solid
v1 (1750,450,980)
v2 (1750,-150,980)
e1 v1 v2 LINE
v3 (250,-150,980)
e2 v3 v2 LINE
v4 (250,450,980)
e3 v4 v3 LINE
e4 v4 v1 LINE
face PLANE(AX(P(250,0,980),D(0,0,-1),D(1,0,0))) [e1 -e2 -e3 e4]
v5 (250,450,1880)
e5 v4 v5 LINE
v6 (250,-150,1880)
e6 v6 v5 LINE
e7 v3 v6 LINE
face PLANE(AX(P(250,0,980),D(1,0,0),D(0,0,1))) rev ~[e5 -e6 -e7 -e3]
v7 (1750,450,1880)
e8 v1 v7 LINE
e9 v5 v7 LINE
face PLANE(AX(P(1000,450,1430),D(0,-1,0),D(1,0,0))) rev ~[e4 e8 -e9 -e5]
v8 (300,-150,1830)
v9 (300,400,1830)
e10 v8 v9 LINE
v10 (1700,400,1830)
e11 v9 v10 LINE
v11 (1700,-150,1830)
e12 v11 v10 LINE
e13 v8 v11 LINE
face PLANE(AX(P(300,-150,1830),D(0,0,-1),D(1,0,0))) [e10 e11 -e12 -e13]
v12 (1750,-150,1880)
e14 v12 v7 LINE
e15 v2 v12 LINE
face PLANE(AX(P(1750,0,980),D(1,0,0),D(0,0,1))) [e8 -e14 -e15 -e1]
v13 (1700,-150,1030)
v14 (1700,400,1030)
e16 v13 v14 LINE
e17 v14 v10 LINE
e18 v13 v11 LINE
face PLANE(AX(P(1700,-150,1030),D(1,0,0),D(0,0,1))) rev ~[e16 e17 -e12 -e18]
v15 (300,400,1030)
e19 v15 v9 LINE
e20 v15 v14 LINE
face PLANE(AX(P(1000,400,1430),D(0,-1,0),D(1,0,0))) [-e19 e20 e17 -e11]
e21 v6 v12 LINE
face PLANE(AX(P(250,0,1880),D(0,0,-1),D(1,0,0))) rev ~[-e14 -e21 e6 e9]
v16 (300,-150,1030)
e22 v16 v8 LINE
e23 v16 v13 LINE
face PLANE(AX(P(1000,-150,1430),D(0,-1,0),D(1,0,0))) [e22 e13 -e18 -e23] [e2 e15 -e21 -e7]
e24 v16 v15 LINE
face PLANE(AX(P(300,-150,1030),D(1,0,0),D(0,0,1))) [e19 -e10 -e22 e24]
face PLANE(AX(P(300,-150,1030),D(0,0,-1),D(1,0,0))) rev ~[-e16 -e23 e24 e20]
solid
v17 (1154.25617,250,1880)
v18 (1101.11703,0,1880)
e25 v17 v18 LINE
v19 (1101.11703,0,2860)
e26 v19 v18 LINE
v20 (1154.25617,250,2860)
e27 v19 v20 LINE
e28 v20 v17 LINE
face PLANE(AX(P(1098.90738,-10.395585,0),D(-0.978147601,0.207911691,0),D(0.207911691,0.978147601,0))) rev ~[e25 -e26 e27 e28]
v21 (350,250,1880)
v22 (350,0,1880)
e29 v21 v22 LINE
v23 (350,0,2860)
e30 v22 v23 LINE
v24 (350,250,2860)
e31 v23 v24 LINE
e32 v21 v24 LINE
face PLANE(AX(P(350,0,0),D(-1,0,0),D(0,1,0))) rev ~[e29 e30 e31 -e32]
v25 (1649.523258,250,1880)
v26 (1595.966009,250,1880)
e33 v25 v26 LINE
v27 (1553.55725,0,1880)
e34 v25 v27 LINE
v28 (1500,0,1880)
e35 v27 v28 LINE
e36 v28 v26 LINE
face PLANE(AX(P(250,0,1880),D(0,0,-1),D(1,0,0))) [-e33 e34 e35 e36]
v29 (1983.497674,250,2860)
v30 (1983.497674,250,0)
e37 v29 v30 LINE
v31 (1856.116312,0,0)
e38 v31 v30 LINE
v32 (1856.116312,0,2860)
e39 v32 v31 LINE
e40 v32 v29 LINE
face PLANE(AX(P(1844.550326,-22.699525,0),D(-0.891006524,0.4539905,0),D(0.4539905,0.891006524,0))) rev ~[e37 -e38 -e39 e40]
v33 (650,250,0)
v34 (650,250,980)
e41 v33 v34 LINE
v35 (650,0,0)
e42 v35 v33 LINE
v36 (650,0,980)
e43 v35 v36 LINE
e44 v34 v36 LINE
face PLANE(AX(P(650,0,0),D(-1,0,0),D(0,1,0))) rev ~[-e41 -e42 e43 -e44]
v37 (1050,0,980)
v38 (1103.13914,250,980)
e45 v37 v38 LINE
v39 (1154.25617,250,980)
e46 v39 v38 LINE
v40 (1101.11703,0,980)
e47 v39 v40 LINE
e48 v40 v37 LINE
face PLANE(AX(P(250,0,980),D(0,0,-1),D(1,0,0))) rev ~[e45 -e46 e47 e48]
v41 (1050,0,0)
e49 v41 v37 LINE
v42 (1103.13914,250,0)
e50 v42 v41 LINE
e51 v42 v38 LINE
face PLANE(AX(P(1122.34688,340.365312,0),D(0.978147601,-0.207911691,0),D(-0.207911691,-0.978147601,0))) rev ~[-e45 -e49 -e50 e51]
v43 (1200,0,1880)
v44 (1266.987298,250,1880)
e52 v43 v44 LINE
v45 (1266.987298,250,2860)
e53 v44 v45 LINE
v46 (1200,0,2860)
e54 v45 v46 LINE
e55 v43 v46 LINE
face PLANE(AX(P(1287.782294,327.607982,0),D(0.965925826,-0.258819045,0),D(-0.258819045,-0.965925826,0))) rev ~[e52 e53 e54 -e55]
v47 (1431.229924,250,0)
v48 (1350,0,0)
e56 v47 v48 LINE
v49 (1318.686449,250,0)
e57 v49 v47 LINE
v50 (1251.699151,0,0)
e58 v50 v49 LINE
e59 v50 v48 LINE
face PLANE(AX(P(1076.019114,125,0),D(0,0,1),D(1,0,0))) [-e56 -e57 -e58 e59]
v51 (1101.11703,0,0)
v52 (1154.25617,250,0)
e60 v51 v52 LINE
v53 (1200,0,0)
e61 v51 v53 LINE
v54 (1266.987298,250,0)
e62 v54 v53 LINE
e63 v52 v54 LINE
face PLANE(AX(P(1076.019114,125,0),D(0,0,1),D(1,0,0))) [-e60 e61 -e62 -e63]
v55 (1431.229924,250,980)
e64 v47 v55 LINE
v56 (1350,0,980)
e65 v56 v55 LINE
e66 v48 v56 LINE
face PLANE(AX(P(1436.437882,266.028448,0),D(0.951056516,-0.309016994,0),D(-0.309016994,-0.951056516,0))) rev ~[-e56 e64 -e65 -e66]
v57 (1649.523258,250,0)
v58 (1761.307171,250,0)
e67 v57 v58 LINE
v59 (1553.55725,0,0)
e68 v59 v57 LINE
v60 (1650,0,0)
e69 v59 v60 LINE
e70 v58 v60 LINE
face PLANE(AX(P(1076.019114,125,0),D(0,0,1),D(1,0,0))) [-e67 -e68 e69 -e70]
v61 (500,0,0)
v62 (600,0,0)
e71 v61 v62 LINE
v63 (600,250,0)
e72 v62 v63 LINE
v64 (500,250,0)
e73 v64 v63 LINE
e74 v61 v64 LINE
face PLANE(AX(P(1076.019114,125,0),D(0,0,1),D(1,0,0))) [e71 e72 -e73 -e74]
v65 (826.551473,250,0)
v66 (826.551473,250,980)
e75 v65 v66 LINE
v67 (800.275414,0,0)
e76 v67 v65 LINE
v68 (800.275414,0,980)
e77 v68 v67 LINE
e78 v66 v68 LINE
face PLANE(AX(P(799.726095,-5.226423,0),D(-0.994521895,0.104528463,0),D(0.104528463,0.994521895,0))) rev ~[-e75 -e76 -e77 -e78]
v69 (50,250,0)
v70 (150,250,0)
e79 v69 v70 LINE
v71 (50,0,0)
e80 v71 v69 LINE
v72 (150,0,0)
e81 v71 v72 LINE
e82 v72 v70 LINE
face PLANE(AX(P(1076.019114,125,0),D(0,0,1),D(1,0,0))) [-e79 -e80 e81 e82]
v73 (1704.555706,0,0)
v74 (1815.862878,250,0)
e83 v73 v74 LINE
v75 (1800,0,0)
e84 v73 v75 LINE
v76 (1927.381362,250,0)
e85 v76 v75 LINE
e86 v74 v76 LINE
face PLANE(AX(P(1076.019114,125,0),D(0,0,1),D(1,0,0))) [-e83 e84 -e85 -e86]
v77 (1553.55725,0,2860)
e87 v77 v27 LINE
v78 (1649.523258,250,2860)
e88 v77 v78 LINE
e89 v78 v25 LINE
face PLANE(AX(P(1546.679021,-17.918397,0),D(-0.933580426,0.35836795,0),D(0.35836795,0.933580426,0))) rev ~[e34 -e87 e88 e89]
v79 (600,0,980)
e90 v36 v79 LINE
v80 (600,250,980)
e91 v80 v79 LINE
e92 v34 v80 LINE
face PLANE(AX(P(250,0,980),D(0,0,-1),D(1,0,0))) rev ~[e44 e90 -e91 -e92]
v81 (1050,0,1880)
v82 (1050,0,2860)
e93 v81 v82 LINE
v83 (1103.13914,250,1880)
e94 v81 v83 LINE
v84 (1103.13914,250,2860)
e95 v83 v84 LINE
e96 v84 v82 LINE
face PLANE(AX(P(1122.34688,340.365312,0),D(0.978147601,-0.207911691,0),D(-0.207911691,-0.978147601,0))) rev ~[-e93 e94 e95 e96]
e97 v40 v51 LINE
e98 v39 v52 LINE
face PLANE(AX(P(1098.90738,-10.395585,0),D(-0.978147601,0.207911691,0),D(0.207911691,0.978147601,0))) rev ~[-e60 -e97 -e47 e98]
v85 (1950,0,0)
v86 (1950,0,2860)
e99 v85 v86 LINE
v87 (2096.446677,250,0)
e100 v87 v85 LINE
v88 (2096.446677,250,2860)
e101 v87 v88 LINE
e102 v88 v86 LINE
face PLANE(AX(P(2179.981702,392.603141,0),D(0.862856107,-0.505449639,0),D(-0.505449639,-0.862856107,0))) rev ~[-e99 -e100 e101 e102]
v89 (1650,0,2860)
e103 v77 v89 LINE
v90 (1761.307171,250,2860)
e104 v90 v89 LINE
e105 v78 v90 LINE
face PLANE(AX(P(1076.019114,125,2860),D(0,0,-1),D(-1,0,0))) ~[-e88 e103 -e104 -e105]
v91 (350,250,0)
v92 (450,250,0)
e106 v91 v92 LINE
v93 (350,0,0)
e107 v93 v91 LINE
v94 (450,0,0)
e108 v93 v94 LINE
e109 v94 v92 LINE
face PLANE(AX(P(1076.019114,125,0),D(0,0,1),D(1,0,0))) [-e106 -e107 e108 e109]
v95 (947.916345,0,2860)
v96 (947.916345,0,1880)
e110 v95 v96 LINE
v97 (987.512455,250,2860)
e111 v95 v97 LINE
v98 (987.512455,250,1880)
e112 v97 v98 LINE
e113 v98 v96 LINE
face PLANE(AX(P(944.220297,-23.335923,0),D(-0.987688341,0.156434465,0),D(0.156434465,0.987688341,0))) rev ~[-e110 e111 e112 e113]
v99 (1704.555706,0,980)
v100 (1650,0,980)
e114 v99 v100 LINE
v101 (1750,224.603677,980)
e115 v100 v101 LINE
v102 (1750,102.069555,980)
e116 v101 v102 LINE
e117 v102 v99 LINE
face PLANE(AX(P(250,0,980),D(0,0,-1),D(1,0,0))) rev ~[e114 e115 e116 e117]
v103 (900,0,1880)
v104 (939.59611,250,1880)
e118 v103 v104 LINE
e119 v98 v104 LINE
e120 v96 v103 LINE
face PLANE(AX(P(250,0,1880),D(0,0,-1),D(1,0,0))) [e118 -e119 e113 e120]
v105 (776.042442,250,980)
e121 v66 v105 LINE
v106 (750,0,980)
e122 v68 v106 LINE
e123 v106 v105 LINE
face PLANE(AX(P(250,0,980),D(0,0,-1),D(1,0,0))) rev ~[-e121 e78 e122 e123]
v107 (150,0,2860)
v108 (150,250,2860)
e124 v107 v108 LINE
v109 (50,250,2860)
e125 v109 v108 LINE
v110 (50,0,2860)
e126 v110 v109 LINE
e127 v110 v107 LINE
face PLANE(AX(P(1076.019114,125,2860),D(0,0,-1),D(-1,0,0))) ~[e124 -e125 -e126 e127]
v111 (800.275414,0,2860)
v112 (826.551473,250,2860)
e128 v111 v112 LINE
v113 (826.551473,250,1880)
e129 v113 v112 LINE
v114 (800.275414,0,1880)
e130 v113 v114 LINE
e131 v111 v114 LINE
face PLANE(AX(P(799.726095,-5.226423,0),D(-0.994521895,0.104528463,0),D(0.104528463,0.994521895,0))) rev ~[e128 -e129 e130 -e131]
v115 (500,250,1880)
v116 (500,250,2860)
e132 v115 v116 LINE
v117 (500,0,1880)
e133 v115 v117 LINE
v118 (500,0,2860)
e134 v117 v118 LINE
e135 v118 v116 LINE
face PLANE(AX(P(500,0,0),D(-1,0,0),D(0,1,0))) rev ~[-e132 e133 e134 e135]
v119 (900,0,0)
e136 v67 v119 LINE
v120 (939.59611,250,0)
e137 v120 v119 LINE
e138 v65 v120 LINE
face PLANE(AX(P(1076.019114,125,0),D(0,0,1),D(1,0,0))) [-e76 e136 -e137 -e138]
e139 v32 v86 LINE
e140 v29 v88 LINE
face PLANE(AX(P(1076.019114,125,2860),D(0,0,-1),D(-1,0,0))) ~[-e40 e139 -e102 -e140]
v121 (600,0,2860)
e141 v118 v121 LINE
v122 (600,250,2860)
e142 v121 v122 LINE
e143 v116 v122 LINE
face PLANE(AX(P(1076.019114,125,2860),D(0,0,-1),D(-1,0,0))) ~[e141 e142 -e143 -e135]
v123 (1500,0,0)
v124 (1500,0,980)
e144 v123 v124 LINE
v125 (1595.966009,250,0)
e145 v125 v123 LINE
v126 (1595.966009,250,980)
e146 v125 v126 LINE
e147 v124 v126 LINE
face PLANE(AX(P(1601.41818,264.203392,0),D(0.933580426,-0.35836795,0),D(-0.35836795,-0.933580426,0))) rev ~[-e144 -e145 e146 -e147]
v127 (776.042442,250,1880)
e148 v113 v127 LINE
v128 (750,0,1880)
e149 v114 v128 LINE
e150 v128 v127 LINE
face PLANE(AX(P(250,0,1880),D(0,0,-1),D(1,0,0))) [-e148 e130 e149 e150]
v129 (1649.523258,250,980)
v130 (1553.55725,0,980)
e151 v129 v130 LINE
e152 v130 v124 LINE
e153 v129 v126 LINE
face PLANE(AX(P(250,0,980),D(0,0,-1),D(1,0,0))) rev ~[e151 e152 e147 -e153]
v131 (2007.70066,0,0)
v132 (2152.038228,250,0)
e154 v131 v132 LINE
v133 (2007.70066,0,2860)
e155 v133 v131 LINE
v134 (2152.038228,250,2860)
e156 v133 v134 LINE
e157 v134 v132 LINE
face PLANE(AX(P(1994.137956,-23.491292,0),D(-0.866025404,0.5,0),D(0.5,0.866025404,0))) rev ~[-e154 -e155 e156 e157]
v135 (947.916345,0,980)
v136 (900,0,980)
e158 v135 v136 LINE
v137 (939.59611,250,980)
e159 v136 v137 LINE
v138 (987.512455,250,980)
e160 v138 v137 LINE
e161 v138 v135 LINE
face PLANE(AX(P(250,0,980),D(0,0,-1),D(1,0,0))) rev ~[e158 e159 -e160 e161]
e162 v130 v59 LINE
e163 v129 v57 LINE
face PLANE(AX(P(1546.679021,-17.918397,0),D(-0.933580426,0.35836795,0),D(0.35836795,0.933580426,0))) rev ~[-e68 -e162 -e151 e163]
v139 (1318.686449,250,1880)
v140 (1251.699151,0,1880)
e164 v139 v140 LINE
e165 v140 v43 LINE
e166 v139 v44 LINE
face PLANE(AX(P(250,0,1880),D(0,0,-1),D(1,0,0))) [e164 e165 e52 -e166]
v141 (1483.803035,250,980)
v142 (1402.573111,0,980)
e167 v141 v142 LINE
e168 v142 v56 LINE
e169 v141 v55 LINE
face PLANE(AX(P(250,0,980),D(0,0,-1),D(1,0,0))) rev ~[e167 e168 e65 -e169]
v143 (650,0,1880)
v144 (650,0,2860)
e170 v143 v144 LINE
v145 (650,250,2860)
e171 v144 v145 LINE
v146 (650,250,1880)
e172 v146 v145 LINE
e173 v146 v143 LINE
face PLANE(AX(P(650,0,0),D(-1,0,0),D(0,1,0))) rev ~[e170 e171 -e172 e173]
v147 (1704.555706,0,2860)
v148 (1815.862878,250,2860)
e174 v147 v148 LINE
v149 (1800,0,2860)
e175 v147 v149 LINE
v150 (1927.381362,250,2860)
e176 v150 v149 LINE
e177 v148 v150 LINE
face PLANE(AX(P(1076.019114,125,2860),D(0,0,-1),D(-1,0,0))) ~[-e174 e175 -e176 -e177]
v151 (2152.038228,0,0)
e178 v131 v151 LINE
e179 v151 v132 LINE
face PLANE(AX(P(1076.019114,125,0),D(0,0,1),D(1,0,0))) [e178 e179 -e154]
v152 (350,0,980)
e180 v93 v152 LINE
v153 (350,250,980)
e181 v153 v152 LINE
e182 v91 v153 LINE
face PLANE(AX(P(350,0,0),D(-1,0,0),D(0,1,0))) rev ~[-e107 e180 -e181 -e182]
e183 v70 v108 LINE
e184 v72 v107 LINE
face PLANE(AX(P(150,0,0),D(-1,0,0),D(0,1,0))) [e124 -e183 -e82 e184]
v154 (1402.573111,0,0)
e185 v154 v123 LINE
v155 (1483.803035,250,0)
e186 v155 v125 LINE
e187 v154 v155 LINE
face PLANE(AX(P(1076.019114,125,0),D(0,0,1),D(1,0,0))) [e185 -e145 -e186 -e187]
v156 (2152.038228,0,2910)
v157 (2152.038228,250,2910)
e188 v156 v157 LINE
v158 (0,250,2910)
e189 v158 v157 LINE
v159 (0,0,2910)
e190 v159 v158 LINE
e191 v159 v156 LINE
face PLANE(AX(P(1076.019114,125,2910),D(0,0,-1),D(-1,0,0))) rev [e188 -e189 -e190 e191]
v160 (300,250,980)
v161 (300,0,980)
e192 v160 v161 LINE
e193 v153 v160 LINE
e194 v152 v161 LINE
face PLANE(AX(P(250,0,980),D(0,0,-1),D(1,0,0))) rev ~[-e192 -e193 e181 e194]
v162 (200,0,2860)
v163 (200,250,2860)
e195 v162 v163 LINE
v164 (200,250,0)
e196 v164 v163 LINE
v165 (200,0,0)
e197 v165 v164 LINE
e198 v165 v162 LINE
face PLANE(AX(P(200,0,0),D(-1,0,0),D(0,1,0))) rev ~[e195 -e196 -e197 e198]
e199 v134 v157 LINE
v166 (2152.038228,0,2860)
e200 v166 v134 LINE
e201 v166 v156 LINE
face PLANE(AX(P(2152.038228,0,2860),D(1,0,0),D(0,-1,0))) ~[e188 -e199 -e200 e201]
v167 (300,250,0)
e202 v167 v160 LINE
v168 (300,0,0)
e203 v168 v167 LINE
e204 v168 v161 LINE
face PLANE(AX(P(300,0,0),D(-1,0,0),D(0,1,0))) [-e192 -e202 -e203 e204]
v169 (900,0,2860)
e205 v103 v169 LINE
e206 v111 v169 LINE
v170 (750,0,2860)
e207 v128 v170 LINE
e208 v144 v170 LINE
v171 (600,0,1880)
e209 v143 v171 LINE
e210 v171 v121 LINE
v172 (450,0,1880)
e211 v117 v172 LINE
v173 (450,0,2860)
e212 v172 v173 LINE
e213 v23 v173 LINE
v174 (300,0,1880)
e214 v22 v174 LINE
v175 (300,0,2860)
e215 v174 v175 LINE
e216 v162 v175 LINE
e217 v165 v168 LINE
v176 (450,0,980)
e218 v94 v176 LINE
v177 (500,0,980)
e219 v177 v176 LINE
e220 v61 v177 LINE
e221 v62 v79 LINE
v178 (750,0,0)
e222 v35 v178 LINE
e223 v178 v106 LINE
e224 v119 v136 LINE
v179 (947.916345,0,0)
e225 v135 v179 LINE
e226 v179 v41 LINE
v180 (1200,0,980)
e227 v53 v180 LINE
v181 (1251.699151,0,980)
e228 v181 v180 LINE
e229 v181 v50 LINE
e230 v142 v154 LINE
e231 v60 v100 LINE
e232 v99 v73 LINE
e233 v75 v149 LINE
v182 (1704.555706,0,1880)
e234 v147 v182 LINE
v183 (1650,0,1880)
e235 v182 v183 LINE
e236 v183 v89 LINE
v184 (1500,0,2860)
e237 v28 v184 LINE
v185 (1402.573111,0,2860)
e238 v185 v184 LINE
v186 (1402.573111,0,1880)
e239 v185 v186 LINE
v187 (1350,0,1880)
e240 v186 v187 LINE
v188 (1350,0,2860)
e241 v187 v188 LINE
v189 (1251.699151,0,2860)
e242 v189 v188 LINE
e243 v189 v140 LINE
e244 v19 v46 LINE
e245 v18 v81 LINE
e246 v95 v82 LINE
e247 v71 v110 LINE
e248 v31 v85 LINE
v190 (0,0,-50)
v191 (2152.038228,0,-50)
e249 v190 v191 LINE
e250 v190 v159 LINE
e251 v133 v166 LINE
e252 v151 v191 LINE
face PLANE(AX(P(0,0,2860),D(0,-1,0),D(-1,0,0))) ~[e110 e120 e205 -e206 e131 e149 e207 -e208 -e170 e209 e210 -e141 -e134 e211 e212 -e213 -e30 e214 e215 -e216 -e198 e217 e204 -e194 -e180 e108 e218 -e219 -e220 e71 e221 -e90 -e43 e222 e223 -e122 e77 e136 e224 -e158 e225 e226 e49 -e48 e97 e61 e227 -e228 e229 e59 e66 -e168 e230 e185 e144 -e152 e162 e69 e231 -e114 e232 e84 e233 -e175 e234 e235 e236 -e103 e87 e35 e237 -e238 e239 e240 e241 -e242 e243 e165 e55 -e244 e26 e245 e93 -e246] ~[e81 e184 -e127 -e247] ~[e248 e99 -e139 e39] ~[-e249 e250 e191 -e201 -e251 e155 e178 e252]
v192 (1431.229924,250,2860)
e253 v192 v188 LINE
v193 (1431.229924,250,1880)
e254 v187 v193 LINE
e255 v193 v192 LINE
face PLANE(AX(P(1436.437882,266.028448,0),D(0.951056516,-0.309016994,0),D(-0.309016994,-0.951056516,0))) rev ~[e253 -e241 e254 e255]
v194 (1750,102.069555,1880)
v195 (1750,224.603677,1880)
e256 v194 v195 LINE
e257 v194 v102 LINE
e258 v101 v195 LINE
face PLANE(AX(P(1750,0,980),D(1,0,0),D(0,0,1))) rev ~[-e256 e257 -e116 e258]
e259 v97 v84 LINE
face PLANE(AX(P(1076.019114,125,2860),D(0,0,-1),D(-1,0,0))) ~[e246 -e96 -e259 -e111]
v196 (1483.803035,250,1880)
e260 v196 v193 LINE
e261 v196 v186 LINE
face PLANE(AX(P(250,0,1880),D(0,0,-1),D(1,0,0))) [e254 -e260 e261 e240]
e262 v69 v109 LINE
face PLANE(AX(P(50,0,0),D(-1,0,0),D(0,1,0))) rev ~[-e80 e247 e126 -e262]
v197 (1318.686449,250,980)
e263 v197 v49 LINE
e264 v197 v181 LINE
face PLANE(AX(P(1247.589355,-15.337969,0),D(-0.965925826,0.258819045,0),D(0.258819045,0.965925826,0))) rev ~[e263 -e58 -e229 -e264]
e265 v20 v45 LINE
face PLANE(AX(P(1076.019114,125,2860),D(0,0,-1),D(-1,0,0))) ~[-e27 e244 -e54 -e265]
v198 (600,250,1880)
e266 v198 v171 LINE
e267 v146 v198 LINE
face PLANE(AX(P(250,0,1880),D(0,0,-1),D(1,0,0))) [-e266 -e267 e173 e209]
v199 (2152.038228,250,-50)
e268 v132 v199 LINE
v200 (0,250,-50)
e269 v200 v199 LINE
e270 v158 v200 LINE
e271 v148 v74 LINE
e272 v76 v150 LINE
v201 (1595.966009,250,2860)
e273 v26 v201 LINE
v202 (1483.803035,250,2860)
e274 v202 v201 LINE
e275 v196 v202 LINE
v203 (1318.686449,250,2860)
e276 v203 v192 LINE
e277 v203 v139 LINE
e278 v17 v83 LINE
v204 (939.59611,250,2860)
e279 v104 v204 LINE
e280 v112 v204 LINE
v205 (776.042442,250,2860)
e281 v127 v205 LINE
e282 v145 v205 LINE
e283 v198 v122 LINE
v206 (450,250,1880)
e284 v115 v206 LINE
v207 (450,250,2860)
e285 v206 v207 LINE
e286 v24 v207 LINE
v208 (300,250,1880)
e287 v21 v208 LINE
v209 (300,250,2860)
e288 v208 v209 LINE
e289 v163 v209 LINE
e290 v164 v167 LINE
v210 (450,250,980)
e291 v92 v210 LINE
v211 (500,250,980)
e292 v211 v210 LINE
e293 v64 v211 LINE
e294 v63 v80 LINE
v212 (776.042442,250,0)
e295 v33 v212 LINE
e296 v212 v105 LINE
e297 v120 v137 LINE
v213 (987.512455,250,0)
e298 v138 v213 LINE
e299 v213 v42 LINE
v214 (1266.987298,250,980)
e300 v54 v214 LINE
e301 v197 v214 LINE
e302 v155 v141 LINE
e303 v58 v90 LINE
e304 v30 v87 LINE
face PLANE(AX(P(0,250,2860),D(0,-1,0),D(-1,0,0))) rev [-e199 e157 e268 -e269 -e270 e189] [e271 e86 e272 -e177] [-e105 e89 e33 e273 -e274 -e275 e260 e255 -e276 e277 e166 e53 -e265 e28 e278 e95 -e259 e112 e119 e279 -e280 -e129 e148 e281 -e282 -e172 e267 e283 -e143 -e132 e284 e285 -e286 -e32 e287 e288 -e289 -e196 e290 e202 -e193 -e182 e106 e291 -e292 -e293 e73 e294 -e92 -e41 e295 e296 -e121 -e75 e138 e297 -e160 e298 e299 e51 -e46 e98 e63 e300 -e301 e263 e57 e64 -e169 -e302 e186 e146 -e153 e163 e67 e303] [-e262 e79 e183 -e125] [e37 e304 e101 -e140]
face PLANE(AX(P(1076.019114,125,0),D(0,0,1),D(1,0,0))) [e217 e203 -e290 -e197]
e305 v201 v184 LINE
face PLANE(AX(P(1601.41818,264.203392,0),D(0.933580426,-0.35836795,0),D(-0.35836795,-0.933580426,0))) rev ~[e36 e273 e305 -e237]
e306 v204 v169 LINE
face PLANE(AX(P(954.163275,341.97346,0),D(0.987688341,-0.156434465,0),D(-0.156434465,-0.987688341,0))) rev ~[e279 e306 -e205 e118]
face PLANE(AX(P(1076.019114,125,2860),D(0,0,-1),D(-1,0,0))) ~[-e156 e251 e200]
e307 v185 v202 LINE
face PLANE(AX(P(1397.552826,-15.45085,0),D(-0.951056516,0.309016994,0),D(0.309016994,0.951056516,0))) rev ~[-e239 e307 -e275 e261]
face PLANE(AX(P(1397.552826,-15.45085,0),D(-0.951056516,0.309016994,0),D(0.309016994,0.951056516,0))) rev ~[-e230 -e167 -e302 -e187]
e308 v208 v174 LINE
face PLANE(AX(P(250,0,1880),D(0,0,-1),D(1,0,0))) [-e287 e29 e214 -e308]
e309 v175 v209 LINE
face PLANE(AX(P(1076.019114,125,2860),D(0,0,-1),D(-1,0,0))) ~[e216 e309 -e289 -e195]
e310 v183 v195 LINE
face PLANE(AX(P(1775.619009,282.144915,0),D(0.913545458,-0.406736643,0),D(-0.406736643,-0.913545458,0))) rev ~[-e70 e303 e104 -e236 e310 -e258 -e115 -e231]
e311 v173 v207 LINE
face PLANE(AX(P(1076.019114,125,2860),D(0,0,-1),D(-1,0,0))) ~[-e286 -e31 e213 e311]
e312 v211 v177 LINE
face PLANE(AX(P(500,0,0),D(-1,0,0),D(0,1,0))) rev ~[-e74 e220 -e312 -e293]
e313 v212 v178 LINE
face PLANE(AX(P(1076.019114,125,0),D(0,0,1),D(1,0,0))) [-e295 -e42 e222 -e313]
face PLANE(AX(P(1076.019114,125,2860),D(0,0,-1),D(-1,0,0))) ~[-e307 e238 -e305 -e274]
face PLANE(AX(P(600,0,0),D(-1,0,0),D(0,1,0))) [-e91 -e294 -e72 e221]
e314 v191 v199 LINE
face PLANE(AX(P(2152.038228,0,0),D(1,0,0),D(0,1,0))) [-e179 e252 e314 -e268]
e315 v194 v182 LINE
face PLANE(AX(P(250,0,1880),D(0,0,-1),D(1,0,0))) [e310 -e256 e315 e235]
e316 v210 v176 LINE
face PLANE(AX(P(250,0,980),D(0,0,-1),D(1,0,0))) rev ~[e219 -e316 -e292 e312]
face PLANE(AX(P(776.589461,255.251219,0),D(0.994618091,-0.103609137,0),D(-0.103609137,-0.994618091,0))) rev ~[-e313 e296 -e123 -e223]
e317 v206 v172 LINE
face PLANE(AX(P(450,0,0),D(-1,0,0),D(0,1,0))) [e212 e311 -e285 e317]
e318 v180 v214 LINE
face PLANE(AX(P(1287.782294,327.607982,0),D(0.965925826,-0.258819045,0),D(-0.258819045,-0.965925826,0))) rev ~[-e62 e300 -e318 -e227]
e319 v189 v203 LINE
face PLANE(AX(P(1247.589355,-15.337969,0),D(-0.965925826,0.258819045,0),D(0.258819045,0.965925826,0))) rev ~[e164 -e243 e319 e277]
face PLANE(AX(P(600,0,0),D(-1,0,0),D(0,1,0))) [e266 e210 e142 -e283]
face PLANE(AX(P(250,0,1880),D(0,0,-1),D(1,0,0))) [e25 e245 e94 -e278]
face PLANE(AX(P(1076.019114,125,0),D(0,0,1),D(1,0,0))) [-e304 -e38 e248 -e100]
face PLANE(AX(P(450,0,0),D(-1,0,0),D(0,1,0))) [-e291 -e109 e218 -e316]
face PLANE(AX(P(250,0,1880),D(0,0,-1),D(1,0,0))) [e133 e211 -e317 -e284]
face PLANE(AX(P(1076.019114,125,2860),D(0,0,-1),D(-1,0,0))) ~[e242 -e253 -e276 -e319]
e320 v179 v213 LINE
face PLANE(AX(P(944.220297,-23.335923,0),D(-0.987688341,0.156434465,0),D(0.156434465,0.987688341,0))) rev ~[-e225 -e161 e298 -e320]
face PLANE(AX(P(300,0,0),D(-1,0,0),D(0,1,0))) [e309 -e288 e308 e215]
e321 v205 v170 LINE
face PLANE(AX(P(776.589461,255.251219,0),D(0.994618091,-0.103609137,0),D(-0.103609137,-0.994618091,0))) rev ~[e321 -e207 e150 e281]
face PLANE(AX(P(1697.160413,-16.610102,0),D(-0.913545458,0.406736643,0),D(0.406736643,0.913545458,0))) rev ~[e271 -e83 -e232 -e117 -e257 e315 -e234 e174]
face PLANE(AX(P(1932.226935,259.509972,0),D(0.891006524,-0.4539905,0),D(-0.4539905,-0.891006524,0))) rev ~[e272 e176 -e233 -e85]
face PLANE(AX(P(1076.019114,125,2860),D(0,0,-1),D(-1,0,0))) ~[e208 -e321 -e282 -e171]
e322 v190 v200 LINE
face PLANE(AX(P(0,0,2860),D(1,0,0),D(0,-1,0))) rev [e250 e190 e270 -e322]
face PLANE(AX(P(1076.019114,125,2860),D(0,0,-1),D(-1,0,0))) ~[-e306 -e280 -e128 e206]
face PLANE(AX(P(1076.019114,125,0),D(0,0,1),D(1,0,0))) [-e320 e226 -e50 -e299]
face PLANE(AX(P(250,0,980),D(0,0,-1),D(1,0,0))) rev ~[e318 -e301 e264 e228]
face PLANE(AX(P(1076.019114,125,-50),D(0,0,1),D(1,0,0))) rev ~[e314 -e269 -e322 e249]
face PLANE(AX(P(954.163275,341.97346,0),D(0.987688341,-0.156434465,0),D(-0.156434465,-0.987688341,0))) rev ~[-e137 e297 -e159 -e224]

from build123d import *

# Parameters (mm, degrees)
F0_W          = 50
F0_H          = 250
F1_DEPTH      = 2860
F2_W          = 2221.6949462891
F2_H          = 250
F3_DEPTH      = 2860.001
F5_W          = 2152.0382275355
F5_H          = 250
F6_DEPTH      = 50
F7_W          = 1500
F7_H          = 900
F8_DEPTH      = 150
F8_DEPTH_BACK = 450
F10_W         = 1400
F10_H         = 800
F11_DEPTH     = 550


# Not quite as in the source:
# - a pattern or mirror of a feature is missing from the dataset's text; its kind, count and spacing are read off the source's solid


with BuildPart() as f1:
    # F0 (on Top) → F1 (new body)
    with BuildSketch(Plane.XY):
        with Locations((25, 125)):
            Rectangle(F0_W, F0_H)
    extrude(amount=F1_DEPTH)


with BuildPart() as f1b:
    # F0 (on Top) → F1, piece 2 (new body)
    with BuildSketch(Plane.XY):
        with Locations((175, 125)):
            Rectangle(F0_W, F0_H)
    extrude(amount=F1_DEPTH)


with BuildPart() as f1c:
    # F0 (on Top) → F1, piece 3 (new body)
    with BuildSketch(Plane.XY):
        with Locations((325, 125)):
            Rectangle(F0_W, F0_H)
    extrude(amount=F1_DEPTH)


with BuildPart() as f1d:
    # F0 (on Top) → F1, piece 4 (new body)
    with BuildSketch(Plane.XY):
        with Locations((475, 125)):
            Rectangle(F0_W, F0_H)
    extrude(amount=F1_DEPTH)


with BuildPart() as f1e:
    # F0 (on Top) → F1, piece 5 (new body)
    with BuildSketch(Plane.XY):
        with Locations((625, 125)):
            Rectangle(F0_W, F0_H)
    extrude(amount=F1_DEPTH)


with BuildPart() as f1f:
    # F0 (on Top) → F1, piece 6 (new body)
    with BuildSketch(Plane.XY):
        Polygon((776.5894605545, 255.2512190888), (750, 0), (799.7260947684, -5.2264231634), (826.5514727946, 250), align=None)
    extrude(amount=F1_DEPTH)


with BuildPart() as f1g:
    # F0 (on Top) → F1, piece 7 (new body)
    with BuildSketch(Plane.XY):
        Polygon((1985.7988202348, 254.516253274), (1932.2269349213, 259.5099715872), (1800, 0), (1844.5503262094, -22.699524987), align=None)
    extrude(amount=F1_DEPTH)


with BuildPart() as f1h:
    # F0 (on Top) → F1, piece 8 (new body)
    with BuildSketch(Plane.XY):
        Polygon((2220.7730672405, 369.0522346192), (2179.9817015181, 392.6031405997), (1950, 0), (1994.1379562017, -23.491292479), align=None)
    extrude(amount=F1_DEPTH)


with BuildPart() as f1i:
    # F0 (on Top) → F1, piece 9 (new body)
    with BuildSketch(Plane.XY):
        Polygon((954.1632750594, 341.9734599461), (900, 0), (944.2202974276, -23.3359228533), (1000.9070231543, 334.5699775654), align=None)
    extrude(amount=F1_DEPTH)


with BuildPart() as f1j:
    # F0 (on Top) → F1, piece 10 (new body)
    with BuildSketch(Plane.XY):
        Polygon((1122.346880499, 340.3653123223), (1050, 0), (1098.9073800367, -10.3955845409), (1171.2542605357, 329.9697277814), align=None)
    extrude(amount=F1_DEPTH)


with BuildPart() as f1k:
    # F0 (on Top) → F1, piece 11 (new body)
    with BuildSketch(Plane.XY):
        Polygon((1287.782294212, 327.6079820043), (1200, 0), (1247.5893550212, -15.3379688571), (1336.018259136, 314.6831941568), align=None)
    extrude(amount=F1_DEPTH)


with BuildPart() as f1l:
    # F0 (on Top) → F1, piece 12 (new body)
    with BuildSketch(Plane.XY):
        Polygon((1436.4378824264, 266.0284477321), (1350, 0), (1397.5528258148, -15.4508497187), (1483.8030352701, 250), align=None)
    extrude(amount=F1_DEPTH)


with BuildPart() as f1m:
    # F0 (on Top) → F1, piece 13 (new body)
    with BuildSketch(Plane.XY):
        Polygon((1601.4181799658, 264.2033915901), (1500, 0), (1546.6790213249, -17.9183974773), (1650.8878155953, 253.5547929215), align=None)
    extrude(amount=F1_DEPTH)


with BuildPart() as f1n:
    # F0 (on Top) → F1, piece 14 (new body)
    with BuildSketch(Plane.XY):
        Polygon((1775.6190094628, 282.1449147549), (1650, 0), (1697.1604126952, -16.6101015777), (1821.1493091009, 261.8735193053), align=None)
    extrude(amount=F1_DEPTH)


with BuildPart() as f3_tool:
    # F2 (on Top) → F3 (new body, through all)
    with BuildSketch(Plane.XY):
        with Locations((1110.8474731445, 125)):
            Rectangle(F2_W, F2_H)
    extrude(amount=F3_DEPTH)


with BuildPart() as f1_1:
    add(f1.part)

    # F3: intersect by f3_tool
    add(f3_tool.part, mode=Mode.INTERSECT)



with BuildPart() as f1b_1:
    add(f1b.part)

    # F3: intersect by f3_tool
    add(f3_tool.part, mode=Mode.INTERSECT)


with BuildPart() as f1c_1:
    add(f1c.part)

    # F3: intersect by f3_tool
    add(f3_tool.part, mode=Mode.INTERSECT)


with BuildPart() as f1d_1:
    add(f1d.part)

    # F3: intersect by f3_tool
    add(f3_tool.part, mode=Mode.INTERSECT)


with BuildPart() as f1e_1:
    add(f1e.part)

    # F3: intersect by f3_tool
    add(f3_tool.part, mode=Mode.INTERSECT)


with BuildPart() as f1f_1:
    add(f1f.part)

    # F3: intersect by f3_tool
    add(f3_tool.part, mode=Mode.INTERSECT)


with BuildPart() as f1g_1:
    add(f1g.part)

    # F3: intersect by f3_tool
    add(f3_tool.part, mode=Mode.INTERSECT)


with BuildPart() as f1h_1:
    add(f1h.part)

    # F3: intersect by f3_tool
    add(f3_tool.part, mode=Mode.INTERSECT)


with BuildPart() as f1i_1:
    add(f1i.part)

    # F3: intersect by f3_tool
    add(f3_tool.part, mode=Mode.INTERSECT)


with BuildPart() as f1j_1:
    add(f1j.part)

    # F3: intersect by f3_tool
    add(f3_tool.part, mode=Mode.INTERSECT)


with BuildPart() as f1k_1:
    add(f1k.part)

    # F3: intersect by f3_tool
    add(f3_tool.part, mode=Mode.INTERSECT)


with BuildPart() as f1l_1:
    add(f1l.part)

    # F3: intersect by f3_tool
    add(f3_tool.part, mode=Mode.INTERSECT)


with BuildPart() as f1m_1:
    add(f1m.part)

    # F3: intersect by f3_tool
    add(f3_tool.part, mode=Mode.INTERSECT)


with BuildPart() as f1n_1:
    add(f1n.part)

    # F3: intersect by f3_tool
    add(f3_tool.part, mode=Mode.INTERSECT)


with BuildPart() as f1_2:
    add(f1_1.part)

    add(f1b_1.part)  # F6 merges F1b

    add(f1c_1.part)  # F6 merges F1c

    add(f1d_1.part)  # F6 merges F1d

    add(f1e_1.part)  # F6 merges F1e

    add(f1f_1.part)  # F6 merges F1f

    add(f1g_1.part)  # F6 merges F1g

    add(f1h_1.part)  # F6 merges F1h

    add(f1i_1.part)  # F6 merges F1i

    add(f1j_1.part)  # F6 merges F1j

    add(f1k_1.part)  # F6 merges F1k

    add(f1l_1.part)  # F6 merges F1l

    add(f1m_1.part)  # F6 merges F1m

    add(f1n_1.part)  # F6 merges F1n
    # F5 (on Top) → F6 (join)
    with BuildSketch(Plane.XY):
        with Locations((1076.0191137678, 125)):
            Rectangle(F5_W, F5_H)
    f6 = extrude(amount=-F6_DEPTH)

    # F6_copies: F6 across plane
    add(f6.mirror(Plane.XY.offset(1430)))


with BuildPart() as f8:
    # F7 (on Front) → F8 (new body, two sides)
    with BuildSketch(Plane.XZ) as f8_sk:
        with Locations((1000, 1430)):
            Rectangle(F7_W, F7_H)
    extrude(amount=F8_DEPTH)
    extrude(f8_sk.sketch, amount=-F8_DEPTH_BACK)


with BuildPart() as f1_3:
    add(f1_2.part)

    # F9: cut F8
    add(f8.part, mode=Mode.SUBTRACT)


with BuildPart() as f8_1:
    add(f8.part)

    # F10 (on face) → F11 (cut)
    with BuildSketch(Plane.XZ.offset(150)):
        with Locations((1000, 1430)):
            Rectangle(F10_W, F10_H)
    extrude(amount=-F11_DEPTH, mode=Mode.SUBTRACT)


solid = Compound([f1_3.part, f8_1.part])
